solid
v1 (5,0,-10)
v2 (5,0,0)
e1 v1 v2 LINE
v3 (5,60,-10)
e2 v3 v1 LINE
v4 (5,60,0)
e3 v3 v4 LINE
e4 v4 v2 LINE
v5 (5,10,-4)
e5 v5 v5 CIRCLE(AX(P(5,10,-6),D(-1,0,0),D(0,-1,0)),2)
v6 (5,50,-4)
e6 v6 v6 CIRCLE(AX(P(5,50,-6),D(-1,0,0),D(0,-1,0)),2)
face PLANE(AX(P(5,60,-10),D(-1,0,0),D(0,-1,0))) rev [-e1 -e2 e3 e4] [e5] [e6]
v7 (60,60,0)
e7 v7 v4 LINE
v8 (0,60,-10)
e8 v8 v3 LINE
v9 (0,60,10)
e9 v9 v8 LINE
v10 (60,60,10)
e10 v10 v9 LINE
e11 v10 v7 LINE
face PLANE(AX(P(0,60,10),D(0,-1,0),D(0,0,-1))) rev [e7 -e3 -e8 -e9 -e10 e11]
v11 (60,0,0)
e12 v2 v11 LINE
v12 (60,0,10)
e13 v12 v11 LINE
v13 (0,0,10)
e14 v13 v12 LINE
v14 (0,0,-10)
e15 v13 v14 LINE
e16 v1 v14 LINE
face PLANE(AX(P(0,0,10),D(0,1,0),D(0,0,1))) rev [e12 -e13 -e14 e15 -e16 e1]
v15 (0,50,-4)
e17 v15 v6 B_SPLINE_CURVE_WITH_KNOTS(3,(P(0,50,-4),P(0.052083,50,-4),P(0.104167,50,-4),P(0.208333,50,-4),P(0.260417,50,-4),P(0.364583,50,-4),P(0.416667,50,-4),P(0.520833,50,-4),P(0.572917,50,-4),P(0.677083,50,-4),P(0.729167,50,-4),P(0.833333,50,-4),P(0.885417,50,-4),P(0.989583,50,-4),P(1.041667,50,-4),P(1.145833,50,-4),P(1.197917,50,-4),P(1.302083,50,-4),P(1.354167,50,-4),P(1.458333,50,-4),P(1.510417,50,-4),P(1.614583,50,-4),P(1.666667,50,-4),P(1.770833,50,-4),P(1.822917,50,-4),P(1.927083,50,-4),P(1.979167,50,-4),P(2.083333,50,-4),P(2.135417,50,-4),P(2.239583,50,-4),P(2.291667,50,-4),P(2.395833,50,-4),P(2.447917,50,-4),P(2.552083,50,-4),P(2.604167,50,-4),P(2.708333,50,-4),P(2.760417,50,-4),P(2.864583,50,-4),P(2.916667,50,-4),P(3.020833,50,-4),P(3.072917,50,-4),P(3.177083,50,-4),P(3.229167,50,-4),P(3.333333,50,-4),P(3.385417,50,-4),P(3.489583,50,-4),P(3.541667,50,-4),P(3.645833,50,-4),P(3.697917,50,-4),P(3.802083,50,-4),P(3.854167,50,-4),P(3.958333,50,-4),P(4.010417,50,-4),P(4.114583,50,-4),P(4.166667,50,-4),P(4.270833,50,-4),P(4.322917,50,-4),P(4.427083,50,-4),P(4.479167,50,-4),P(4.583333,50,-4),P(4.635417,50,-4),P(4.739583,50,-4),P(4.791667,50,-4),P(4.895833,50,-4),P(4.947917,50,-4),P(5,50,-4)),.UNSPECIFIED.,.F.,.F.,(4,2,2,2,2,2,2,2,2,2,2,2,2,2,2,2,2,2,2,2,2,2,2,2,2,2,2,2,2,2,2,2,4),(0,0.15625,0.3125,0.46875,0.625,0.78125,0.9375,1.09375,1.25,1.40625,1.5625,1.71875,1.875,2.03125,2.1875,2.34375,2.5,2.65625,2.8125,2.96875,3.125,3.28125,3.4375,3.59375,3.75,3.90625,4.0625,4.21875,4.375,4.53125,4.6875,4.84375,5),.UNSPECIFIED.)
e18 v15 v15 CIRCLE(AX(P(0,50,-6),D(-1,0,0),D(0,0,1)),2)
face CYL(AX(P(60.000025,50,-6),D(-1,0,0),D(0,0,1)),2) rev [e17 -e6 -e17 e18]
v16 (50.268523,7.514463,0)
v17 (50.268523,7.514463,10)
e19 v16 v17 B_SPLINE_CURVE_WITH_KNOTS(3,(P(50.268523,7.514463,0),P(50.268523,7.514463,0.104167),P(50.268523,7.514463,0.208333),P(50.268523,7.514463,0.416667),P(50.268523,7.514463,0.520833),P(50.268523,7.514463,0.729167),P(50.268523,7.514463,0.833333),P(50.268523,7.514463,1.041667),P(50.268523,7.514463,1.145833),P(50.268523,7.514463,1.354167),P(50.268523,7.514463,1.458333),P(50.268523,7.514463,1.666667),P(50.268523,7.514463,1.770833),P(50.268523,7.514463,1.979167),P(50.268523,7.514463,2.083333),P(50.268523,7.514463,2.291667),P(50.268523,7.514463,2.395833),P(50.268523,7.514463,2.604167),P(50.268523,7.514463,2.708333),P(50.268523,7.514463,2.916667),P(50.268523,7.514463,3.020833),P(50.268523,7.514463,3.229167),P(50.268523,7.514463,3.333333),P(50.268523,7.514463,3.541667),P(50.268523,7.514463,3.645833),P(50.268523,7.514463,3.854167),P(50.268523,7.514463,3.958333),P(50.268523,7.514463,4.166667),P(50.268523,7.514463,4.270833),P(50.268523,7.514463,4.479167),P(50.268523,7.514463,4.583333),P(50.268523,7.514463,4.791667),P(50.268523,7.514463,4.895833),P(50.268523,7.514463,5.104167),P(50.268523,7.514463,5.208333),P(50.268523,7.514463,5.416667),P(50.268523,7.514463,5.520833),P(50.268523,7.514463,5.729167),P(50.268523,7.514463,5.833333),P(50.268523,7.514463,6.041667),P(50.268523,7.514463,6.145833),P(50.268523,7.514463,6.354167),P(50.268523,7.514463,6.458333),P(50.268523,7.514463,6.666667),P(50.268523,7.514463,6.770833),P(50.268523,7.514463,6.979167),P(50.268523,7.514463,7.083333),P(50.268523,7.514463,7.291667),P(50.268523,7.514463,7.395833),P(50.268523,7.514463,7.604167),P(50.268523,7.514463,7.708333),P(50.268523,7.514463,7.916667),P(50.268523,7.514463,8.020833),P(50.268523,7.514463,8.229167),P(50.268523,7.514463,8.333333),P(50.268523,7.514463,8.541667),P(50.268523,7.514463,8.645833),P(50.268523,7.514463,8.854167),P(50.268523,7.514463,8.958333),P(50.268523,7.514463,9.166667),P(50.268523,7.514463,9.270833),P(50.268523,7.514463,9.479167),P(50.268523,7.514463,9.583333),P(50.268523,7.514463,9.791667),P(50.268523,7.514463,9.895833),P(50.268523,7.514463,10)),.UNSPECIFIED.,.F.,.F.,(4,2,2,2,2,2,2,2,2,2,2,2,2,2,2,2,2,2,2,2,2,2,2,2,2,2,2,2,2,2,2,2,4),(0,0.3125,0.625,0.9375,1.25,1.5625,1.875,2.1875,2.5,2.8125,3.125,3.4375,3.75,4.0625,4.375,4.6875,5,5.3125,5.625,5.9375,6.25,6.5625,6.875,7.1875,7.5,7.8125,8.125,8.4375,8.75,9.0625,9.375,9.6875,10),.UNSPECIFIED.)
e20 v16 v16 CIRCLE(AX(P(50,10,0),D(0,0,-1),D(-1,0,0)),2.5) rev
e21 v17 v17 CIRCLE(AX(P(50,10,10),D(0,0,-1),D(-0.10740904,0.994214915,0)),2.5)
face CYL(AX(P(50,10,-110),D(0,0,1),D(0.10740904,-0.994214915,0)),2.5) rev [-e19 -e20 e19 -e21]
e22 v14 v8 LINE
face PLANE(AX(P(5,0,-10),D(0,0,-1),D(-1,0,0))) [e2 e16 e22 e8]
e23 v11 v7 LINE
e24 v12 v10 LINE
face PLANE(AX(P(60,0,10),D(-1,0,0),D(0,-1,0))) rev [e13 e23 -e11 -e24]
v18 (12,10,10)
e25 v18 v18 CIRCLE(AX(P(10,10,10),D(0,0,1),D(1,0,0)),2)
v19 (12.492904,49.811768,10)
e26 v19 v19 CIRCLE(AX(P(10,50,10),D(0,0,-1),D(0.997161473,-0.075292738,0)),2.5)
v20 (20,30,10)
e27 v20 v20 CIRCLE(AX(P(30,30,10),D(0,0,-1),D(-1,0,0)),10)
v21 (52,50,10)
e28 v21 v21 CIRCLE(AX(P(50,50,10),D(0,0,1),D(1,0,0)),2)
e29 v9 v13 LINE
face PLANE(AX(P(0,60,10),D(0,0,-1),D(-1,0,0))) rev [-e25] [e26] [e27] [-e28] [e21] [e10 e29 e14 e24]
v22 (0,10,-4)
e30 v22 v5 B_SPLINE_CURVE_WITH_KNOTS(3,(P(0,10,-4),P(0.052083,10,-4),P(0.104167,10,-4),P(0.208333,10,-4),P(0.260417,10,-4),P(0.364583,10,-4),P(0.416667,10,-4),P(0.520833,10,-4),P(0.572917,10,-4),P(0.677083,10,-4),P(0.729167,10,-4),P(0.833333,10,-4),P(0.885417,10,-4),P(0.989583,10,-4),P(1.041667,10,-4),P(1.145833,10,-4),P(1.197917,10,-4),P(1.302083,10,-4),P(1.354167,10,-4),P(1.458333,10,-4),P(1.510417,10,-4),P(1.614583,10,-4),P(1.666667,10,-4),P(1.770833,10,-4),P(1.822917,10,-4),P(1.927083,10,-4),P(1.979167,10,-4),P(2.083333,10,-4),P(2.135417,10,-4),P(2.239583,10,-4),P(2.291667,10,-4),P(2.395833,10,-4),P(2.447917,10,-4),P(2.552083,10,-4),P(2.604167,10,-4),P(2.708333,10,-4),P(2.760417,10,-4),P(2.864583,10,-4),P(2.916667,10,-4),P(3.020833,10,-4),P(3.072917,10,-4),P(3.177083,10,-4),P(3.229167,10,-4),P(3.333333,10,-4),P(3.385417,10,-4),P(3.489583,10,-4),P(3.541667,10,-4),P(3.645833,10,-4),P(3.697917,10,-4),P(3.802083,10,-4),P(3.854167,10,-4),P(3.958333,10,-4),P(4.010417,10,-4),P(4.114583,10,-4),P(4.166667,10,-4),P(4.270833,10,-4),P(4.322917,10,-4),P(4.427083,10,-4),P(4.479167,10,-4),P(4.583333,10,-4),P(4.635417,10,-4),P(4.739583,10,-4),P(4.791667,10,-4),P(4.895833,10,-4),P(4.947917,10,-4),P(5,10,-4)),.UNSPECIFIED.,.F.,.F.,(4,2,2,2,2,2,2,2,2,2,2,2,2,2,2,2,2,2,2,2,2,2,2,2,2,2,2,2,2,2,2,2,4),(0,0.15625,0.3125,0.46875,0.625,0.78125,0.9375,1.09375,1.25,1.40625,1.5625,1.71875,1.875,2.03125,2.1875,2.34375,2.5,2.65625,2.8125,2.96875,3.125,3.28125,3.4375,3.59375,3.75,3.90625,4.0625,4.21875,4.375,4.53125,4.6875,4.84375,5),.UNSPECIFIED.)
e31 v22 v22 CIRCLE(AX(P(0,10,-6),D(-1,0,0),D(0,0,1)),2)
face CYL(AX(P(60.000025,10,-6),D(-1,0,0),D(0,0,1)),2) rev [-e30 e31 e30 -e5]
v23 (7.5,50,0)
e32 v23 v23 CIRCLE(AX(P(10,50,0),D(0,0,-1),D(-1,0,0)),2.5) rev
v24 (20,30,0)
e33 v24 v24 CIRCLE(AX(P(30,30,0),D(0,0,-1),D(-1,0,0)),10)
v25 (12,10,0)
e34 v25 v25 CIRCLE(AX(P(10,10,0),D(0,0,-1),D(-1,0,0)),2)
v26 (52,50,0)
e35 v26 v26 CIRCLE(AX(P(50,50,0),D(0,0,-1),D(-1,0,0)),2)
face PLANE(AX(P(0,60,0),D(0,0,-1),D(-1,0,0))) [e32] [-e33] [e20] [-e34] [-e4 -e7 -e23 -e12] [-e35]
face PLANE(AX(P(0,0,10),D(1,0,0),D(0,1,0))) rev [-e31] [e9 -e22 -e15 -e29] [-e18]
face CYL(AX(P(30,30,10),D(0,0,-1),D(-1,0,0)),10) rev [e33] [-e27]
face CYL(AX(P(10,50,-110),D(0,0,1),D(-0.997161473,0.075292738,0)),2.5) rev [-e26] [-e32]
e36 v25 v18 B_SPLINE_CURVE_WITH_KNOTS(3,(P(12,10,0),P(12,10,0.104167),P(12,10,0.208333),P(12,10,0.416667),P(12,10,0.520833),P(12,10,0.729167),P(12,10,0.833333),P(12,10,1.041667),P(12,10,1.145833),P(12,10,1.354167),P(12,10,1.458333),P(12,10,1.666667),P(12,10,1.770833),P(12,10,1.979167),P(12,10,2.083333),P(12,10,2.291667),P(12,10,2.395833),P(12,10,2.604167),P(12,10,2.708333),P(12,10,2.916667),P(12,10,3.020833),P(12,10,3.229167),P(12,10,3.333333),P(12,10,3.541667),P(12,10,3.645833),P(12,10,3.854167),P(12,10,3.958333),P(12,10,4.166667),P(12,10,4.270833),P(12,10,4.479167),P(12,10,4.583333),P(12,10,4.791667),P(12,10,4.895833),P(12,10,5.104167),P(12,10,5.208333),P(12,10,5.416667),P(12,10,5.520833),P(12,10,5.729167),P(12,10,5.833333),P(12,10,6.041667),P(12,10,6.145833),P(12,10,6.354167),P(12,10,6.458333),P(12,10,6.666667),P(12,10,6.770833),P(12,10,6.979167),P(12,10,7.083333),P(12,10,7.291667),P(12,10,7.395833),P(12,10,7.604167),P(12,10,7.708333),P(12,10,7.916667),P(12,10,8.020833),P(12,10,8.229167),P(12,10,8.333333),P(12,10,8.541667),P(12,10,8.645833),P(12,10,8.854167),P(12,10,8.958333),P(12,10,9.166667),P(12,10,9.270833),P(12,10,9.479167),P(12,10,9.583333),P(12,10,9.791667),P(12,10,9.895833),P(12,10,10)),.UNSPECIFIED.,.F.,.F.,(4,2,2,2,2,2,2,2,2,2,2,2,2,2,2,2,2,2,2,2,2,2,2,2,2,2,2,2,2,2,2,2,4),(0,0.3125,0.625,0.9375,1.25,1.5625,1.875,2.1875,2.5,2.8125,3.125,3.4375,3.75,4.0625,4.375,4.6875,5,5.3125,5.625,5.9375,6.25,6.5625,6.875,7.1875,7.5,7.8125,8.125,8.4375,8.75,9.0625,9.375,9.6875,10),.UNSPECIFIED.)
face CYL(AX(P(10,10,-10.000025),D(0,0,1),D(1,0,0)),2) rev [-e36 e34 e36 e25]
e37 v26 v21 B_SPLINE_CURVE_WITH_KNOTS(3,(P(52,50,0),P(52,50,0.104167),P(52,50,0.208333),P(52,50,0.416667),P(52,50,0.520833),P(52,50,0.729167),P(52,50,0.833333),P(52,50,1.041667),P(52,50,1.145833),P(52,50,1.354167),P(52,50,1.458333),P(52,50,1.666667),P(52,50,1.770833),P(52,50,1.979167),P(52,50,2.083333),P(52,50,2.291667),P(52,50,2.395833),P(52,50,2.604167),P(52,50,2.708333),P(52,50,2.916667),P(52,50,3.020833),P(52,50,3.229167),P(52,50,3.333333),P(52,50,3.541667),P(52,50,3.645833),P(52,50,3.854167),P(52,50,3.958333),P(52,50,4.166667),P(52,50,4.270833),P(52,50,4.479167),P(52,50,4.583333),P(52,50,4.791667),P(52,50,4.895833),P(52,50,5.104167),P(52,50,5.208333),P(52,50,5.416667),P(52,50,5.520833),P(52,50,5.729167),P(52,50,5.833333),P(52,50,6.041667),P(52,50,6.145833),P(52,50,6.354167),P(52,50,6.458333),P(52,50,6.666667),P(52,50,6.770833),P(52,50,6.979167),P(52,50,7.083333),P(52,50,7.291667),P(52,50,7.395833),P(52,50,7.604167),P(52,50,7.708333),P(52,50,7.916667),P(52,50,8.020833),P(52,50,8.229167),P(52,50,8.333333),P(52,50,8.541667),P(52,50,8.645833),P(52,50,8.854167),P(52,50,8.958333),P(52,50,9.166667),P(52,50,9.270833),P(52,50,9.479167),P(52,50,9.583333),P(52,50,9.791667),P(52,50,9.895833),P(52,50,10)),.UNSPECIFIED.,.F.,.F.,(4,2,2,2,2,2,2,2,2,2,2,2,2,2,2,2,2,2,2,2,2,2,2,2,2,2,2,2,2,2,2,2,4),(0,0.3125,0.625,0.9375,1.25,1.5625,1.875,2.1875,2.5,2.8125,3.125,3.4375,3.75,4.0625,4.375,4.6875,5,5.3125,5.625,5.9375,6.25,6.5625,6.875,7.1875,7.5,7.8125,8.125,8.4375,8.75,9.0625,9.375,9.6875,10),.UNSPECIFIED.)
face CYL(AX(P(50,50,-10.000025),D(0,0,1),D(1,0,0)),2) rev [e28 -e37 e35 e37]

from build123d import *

# Parameters (mm, degrees)
SKETCH1_W           = 60
SKETCH1_H           = 60
BOSS_EXTRUDE1_DEPTH = 10
SKETCH4_W           = 5
SKETCH4_H           = 60
BOSS_EXTRUDE2_DEPTH = 10
SKETCH5_R           = 2
CUT_EXTRUDE3_DEPTH  = 86.440037453
SKETCH2_R           = 10
CUT_EXTRUDE5_DEPTH  = 86.440037453
CAVITY1_OUTLINE_R   = 2.5
CAVITY1_DEPTH       = 10
SKETCH7_R           = 2
CUT_EXTRUDE6_DEPTH  = 88.177978871


# Read off the part's stored shape, not the designer's step: Cavity1
with BuildPart() as part:
    # Sketch1 → Boss-Extrude1 (new body)
    with BuildSketch(Plane.XY):
        with Locations((30, 30)):
            Rectangle(SKETCH1_W, SKETCH1_H)
    extrude(amount=BOSS_EXTRUDE1_DEPTH)

    # Sketch4 → Boss-Extrude2 (add)
    with BuildSketch(Plane(origin=(0, 0, 0), x_dir=(-1, 0, 0), z_dir=(0, 0, -1))):
        with Locations((-2.5, 30)):
            Rectangle(SKETCH4_W, SKETCH4_H)
    extrude(amount=BOSS_EXTRUDE2_DEPTH)

    # Sketch5 → Cut-Extrude3 (cut, through all)
    with BuildSketch(Plane.ZY):
        with Locations((-6, 50)):
            Circle(SKETCH5_R)
        with Locations((-6, 10)):
            Circle(SKETCH5_R)
    extrude(amount=-CUT_EXTRUDE3_DEPTH, mode=Mode.SUBTRACT)

    # Sketch2 → Cut-Extrude5 (cut, through all)
    with BuildSketch(Plane(origin=(0, 0, 0), x_dir=(-1, 0, 0), z_dir=(0, 0, -1))):
        with Locations((-30, 30)):
            Circle(SKETCH2_R)
    extrude(amount=-CUT_EXTRUDE5_DEPTH, mode=Mode.SUBTRACT)

    # Cavity1 outline → Cavity1 (cut)
    with BuildSketch(Plane.XY):
        with Locations((10, 50)):
            Circle(CAVITY1_OUTLINE_R)
        with Locations((50, 10)):
            Circle(CAVITY1_OUTLINE_R)
    extrude(amount=CAVITY1_DEPTH, mode=Mode.SUBTRACT)

    # Sketch7 → Cut-Extrude6 (cut, through all)
    with BuildSketch(Plane.XY.offset(10)):
        with Locations((50, 50)):
            Circle(SKETCH7_R)
        with Locations((10, 10)):
            Circle(SKETCH7_R)
    extrude(amount=-CUT_EXTRUDE6_DEPTH, mode=Mode.SUBTRACT)


solid = part.part
